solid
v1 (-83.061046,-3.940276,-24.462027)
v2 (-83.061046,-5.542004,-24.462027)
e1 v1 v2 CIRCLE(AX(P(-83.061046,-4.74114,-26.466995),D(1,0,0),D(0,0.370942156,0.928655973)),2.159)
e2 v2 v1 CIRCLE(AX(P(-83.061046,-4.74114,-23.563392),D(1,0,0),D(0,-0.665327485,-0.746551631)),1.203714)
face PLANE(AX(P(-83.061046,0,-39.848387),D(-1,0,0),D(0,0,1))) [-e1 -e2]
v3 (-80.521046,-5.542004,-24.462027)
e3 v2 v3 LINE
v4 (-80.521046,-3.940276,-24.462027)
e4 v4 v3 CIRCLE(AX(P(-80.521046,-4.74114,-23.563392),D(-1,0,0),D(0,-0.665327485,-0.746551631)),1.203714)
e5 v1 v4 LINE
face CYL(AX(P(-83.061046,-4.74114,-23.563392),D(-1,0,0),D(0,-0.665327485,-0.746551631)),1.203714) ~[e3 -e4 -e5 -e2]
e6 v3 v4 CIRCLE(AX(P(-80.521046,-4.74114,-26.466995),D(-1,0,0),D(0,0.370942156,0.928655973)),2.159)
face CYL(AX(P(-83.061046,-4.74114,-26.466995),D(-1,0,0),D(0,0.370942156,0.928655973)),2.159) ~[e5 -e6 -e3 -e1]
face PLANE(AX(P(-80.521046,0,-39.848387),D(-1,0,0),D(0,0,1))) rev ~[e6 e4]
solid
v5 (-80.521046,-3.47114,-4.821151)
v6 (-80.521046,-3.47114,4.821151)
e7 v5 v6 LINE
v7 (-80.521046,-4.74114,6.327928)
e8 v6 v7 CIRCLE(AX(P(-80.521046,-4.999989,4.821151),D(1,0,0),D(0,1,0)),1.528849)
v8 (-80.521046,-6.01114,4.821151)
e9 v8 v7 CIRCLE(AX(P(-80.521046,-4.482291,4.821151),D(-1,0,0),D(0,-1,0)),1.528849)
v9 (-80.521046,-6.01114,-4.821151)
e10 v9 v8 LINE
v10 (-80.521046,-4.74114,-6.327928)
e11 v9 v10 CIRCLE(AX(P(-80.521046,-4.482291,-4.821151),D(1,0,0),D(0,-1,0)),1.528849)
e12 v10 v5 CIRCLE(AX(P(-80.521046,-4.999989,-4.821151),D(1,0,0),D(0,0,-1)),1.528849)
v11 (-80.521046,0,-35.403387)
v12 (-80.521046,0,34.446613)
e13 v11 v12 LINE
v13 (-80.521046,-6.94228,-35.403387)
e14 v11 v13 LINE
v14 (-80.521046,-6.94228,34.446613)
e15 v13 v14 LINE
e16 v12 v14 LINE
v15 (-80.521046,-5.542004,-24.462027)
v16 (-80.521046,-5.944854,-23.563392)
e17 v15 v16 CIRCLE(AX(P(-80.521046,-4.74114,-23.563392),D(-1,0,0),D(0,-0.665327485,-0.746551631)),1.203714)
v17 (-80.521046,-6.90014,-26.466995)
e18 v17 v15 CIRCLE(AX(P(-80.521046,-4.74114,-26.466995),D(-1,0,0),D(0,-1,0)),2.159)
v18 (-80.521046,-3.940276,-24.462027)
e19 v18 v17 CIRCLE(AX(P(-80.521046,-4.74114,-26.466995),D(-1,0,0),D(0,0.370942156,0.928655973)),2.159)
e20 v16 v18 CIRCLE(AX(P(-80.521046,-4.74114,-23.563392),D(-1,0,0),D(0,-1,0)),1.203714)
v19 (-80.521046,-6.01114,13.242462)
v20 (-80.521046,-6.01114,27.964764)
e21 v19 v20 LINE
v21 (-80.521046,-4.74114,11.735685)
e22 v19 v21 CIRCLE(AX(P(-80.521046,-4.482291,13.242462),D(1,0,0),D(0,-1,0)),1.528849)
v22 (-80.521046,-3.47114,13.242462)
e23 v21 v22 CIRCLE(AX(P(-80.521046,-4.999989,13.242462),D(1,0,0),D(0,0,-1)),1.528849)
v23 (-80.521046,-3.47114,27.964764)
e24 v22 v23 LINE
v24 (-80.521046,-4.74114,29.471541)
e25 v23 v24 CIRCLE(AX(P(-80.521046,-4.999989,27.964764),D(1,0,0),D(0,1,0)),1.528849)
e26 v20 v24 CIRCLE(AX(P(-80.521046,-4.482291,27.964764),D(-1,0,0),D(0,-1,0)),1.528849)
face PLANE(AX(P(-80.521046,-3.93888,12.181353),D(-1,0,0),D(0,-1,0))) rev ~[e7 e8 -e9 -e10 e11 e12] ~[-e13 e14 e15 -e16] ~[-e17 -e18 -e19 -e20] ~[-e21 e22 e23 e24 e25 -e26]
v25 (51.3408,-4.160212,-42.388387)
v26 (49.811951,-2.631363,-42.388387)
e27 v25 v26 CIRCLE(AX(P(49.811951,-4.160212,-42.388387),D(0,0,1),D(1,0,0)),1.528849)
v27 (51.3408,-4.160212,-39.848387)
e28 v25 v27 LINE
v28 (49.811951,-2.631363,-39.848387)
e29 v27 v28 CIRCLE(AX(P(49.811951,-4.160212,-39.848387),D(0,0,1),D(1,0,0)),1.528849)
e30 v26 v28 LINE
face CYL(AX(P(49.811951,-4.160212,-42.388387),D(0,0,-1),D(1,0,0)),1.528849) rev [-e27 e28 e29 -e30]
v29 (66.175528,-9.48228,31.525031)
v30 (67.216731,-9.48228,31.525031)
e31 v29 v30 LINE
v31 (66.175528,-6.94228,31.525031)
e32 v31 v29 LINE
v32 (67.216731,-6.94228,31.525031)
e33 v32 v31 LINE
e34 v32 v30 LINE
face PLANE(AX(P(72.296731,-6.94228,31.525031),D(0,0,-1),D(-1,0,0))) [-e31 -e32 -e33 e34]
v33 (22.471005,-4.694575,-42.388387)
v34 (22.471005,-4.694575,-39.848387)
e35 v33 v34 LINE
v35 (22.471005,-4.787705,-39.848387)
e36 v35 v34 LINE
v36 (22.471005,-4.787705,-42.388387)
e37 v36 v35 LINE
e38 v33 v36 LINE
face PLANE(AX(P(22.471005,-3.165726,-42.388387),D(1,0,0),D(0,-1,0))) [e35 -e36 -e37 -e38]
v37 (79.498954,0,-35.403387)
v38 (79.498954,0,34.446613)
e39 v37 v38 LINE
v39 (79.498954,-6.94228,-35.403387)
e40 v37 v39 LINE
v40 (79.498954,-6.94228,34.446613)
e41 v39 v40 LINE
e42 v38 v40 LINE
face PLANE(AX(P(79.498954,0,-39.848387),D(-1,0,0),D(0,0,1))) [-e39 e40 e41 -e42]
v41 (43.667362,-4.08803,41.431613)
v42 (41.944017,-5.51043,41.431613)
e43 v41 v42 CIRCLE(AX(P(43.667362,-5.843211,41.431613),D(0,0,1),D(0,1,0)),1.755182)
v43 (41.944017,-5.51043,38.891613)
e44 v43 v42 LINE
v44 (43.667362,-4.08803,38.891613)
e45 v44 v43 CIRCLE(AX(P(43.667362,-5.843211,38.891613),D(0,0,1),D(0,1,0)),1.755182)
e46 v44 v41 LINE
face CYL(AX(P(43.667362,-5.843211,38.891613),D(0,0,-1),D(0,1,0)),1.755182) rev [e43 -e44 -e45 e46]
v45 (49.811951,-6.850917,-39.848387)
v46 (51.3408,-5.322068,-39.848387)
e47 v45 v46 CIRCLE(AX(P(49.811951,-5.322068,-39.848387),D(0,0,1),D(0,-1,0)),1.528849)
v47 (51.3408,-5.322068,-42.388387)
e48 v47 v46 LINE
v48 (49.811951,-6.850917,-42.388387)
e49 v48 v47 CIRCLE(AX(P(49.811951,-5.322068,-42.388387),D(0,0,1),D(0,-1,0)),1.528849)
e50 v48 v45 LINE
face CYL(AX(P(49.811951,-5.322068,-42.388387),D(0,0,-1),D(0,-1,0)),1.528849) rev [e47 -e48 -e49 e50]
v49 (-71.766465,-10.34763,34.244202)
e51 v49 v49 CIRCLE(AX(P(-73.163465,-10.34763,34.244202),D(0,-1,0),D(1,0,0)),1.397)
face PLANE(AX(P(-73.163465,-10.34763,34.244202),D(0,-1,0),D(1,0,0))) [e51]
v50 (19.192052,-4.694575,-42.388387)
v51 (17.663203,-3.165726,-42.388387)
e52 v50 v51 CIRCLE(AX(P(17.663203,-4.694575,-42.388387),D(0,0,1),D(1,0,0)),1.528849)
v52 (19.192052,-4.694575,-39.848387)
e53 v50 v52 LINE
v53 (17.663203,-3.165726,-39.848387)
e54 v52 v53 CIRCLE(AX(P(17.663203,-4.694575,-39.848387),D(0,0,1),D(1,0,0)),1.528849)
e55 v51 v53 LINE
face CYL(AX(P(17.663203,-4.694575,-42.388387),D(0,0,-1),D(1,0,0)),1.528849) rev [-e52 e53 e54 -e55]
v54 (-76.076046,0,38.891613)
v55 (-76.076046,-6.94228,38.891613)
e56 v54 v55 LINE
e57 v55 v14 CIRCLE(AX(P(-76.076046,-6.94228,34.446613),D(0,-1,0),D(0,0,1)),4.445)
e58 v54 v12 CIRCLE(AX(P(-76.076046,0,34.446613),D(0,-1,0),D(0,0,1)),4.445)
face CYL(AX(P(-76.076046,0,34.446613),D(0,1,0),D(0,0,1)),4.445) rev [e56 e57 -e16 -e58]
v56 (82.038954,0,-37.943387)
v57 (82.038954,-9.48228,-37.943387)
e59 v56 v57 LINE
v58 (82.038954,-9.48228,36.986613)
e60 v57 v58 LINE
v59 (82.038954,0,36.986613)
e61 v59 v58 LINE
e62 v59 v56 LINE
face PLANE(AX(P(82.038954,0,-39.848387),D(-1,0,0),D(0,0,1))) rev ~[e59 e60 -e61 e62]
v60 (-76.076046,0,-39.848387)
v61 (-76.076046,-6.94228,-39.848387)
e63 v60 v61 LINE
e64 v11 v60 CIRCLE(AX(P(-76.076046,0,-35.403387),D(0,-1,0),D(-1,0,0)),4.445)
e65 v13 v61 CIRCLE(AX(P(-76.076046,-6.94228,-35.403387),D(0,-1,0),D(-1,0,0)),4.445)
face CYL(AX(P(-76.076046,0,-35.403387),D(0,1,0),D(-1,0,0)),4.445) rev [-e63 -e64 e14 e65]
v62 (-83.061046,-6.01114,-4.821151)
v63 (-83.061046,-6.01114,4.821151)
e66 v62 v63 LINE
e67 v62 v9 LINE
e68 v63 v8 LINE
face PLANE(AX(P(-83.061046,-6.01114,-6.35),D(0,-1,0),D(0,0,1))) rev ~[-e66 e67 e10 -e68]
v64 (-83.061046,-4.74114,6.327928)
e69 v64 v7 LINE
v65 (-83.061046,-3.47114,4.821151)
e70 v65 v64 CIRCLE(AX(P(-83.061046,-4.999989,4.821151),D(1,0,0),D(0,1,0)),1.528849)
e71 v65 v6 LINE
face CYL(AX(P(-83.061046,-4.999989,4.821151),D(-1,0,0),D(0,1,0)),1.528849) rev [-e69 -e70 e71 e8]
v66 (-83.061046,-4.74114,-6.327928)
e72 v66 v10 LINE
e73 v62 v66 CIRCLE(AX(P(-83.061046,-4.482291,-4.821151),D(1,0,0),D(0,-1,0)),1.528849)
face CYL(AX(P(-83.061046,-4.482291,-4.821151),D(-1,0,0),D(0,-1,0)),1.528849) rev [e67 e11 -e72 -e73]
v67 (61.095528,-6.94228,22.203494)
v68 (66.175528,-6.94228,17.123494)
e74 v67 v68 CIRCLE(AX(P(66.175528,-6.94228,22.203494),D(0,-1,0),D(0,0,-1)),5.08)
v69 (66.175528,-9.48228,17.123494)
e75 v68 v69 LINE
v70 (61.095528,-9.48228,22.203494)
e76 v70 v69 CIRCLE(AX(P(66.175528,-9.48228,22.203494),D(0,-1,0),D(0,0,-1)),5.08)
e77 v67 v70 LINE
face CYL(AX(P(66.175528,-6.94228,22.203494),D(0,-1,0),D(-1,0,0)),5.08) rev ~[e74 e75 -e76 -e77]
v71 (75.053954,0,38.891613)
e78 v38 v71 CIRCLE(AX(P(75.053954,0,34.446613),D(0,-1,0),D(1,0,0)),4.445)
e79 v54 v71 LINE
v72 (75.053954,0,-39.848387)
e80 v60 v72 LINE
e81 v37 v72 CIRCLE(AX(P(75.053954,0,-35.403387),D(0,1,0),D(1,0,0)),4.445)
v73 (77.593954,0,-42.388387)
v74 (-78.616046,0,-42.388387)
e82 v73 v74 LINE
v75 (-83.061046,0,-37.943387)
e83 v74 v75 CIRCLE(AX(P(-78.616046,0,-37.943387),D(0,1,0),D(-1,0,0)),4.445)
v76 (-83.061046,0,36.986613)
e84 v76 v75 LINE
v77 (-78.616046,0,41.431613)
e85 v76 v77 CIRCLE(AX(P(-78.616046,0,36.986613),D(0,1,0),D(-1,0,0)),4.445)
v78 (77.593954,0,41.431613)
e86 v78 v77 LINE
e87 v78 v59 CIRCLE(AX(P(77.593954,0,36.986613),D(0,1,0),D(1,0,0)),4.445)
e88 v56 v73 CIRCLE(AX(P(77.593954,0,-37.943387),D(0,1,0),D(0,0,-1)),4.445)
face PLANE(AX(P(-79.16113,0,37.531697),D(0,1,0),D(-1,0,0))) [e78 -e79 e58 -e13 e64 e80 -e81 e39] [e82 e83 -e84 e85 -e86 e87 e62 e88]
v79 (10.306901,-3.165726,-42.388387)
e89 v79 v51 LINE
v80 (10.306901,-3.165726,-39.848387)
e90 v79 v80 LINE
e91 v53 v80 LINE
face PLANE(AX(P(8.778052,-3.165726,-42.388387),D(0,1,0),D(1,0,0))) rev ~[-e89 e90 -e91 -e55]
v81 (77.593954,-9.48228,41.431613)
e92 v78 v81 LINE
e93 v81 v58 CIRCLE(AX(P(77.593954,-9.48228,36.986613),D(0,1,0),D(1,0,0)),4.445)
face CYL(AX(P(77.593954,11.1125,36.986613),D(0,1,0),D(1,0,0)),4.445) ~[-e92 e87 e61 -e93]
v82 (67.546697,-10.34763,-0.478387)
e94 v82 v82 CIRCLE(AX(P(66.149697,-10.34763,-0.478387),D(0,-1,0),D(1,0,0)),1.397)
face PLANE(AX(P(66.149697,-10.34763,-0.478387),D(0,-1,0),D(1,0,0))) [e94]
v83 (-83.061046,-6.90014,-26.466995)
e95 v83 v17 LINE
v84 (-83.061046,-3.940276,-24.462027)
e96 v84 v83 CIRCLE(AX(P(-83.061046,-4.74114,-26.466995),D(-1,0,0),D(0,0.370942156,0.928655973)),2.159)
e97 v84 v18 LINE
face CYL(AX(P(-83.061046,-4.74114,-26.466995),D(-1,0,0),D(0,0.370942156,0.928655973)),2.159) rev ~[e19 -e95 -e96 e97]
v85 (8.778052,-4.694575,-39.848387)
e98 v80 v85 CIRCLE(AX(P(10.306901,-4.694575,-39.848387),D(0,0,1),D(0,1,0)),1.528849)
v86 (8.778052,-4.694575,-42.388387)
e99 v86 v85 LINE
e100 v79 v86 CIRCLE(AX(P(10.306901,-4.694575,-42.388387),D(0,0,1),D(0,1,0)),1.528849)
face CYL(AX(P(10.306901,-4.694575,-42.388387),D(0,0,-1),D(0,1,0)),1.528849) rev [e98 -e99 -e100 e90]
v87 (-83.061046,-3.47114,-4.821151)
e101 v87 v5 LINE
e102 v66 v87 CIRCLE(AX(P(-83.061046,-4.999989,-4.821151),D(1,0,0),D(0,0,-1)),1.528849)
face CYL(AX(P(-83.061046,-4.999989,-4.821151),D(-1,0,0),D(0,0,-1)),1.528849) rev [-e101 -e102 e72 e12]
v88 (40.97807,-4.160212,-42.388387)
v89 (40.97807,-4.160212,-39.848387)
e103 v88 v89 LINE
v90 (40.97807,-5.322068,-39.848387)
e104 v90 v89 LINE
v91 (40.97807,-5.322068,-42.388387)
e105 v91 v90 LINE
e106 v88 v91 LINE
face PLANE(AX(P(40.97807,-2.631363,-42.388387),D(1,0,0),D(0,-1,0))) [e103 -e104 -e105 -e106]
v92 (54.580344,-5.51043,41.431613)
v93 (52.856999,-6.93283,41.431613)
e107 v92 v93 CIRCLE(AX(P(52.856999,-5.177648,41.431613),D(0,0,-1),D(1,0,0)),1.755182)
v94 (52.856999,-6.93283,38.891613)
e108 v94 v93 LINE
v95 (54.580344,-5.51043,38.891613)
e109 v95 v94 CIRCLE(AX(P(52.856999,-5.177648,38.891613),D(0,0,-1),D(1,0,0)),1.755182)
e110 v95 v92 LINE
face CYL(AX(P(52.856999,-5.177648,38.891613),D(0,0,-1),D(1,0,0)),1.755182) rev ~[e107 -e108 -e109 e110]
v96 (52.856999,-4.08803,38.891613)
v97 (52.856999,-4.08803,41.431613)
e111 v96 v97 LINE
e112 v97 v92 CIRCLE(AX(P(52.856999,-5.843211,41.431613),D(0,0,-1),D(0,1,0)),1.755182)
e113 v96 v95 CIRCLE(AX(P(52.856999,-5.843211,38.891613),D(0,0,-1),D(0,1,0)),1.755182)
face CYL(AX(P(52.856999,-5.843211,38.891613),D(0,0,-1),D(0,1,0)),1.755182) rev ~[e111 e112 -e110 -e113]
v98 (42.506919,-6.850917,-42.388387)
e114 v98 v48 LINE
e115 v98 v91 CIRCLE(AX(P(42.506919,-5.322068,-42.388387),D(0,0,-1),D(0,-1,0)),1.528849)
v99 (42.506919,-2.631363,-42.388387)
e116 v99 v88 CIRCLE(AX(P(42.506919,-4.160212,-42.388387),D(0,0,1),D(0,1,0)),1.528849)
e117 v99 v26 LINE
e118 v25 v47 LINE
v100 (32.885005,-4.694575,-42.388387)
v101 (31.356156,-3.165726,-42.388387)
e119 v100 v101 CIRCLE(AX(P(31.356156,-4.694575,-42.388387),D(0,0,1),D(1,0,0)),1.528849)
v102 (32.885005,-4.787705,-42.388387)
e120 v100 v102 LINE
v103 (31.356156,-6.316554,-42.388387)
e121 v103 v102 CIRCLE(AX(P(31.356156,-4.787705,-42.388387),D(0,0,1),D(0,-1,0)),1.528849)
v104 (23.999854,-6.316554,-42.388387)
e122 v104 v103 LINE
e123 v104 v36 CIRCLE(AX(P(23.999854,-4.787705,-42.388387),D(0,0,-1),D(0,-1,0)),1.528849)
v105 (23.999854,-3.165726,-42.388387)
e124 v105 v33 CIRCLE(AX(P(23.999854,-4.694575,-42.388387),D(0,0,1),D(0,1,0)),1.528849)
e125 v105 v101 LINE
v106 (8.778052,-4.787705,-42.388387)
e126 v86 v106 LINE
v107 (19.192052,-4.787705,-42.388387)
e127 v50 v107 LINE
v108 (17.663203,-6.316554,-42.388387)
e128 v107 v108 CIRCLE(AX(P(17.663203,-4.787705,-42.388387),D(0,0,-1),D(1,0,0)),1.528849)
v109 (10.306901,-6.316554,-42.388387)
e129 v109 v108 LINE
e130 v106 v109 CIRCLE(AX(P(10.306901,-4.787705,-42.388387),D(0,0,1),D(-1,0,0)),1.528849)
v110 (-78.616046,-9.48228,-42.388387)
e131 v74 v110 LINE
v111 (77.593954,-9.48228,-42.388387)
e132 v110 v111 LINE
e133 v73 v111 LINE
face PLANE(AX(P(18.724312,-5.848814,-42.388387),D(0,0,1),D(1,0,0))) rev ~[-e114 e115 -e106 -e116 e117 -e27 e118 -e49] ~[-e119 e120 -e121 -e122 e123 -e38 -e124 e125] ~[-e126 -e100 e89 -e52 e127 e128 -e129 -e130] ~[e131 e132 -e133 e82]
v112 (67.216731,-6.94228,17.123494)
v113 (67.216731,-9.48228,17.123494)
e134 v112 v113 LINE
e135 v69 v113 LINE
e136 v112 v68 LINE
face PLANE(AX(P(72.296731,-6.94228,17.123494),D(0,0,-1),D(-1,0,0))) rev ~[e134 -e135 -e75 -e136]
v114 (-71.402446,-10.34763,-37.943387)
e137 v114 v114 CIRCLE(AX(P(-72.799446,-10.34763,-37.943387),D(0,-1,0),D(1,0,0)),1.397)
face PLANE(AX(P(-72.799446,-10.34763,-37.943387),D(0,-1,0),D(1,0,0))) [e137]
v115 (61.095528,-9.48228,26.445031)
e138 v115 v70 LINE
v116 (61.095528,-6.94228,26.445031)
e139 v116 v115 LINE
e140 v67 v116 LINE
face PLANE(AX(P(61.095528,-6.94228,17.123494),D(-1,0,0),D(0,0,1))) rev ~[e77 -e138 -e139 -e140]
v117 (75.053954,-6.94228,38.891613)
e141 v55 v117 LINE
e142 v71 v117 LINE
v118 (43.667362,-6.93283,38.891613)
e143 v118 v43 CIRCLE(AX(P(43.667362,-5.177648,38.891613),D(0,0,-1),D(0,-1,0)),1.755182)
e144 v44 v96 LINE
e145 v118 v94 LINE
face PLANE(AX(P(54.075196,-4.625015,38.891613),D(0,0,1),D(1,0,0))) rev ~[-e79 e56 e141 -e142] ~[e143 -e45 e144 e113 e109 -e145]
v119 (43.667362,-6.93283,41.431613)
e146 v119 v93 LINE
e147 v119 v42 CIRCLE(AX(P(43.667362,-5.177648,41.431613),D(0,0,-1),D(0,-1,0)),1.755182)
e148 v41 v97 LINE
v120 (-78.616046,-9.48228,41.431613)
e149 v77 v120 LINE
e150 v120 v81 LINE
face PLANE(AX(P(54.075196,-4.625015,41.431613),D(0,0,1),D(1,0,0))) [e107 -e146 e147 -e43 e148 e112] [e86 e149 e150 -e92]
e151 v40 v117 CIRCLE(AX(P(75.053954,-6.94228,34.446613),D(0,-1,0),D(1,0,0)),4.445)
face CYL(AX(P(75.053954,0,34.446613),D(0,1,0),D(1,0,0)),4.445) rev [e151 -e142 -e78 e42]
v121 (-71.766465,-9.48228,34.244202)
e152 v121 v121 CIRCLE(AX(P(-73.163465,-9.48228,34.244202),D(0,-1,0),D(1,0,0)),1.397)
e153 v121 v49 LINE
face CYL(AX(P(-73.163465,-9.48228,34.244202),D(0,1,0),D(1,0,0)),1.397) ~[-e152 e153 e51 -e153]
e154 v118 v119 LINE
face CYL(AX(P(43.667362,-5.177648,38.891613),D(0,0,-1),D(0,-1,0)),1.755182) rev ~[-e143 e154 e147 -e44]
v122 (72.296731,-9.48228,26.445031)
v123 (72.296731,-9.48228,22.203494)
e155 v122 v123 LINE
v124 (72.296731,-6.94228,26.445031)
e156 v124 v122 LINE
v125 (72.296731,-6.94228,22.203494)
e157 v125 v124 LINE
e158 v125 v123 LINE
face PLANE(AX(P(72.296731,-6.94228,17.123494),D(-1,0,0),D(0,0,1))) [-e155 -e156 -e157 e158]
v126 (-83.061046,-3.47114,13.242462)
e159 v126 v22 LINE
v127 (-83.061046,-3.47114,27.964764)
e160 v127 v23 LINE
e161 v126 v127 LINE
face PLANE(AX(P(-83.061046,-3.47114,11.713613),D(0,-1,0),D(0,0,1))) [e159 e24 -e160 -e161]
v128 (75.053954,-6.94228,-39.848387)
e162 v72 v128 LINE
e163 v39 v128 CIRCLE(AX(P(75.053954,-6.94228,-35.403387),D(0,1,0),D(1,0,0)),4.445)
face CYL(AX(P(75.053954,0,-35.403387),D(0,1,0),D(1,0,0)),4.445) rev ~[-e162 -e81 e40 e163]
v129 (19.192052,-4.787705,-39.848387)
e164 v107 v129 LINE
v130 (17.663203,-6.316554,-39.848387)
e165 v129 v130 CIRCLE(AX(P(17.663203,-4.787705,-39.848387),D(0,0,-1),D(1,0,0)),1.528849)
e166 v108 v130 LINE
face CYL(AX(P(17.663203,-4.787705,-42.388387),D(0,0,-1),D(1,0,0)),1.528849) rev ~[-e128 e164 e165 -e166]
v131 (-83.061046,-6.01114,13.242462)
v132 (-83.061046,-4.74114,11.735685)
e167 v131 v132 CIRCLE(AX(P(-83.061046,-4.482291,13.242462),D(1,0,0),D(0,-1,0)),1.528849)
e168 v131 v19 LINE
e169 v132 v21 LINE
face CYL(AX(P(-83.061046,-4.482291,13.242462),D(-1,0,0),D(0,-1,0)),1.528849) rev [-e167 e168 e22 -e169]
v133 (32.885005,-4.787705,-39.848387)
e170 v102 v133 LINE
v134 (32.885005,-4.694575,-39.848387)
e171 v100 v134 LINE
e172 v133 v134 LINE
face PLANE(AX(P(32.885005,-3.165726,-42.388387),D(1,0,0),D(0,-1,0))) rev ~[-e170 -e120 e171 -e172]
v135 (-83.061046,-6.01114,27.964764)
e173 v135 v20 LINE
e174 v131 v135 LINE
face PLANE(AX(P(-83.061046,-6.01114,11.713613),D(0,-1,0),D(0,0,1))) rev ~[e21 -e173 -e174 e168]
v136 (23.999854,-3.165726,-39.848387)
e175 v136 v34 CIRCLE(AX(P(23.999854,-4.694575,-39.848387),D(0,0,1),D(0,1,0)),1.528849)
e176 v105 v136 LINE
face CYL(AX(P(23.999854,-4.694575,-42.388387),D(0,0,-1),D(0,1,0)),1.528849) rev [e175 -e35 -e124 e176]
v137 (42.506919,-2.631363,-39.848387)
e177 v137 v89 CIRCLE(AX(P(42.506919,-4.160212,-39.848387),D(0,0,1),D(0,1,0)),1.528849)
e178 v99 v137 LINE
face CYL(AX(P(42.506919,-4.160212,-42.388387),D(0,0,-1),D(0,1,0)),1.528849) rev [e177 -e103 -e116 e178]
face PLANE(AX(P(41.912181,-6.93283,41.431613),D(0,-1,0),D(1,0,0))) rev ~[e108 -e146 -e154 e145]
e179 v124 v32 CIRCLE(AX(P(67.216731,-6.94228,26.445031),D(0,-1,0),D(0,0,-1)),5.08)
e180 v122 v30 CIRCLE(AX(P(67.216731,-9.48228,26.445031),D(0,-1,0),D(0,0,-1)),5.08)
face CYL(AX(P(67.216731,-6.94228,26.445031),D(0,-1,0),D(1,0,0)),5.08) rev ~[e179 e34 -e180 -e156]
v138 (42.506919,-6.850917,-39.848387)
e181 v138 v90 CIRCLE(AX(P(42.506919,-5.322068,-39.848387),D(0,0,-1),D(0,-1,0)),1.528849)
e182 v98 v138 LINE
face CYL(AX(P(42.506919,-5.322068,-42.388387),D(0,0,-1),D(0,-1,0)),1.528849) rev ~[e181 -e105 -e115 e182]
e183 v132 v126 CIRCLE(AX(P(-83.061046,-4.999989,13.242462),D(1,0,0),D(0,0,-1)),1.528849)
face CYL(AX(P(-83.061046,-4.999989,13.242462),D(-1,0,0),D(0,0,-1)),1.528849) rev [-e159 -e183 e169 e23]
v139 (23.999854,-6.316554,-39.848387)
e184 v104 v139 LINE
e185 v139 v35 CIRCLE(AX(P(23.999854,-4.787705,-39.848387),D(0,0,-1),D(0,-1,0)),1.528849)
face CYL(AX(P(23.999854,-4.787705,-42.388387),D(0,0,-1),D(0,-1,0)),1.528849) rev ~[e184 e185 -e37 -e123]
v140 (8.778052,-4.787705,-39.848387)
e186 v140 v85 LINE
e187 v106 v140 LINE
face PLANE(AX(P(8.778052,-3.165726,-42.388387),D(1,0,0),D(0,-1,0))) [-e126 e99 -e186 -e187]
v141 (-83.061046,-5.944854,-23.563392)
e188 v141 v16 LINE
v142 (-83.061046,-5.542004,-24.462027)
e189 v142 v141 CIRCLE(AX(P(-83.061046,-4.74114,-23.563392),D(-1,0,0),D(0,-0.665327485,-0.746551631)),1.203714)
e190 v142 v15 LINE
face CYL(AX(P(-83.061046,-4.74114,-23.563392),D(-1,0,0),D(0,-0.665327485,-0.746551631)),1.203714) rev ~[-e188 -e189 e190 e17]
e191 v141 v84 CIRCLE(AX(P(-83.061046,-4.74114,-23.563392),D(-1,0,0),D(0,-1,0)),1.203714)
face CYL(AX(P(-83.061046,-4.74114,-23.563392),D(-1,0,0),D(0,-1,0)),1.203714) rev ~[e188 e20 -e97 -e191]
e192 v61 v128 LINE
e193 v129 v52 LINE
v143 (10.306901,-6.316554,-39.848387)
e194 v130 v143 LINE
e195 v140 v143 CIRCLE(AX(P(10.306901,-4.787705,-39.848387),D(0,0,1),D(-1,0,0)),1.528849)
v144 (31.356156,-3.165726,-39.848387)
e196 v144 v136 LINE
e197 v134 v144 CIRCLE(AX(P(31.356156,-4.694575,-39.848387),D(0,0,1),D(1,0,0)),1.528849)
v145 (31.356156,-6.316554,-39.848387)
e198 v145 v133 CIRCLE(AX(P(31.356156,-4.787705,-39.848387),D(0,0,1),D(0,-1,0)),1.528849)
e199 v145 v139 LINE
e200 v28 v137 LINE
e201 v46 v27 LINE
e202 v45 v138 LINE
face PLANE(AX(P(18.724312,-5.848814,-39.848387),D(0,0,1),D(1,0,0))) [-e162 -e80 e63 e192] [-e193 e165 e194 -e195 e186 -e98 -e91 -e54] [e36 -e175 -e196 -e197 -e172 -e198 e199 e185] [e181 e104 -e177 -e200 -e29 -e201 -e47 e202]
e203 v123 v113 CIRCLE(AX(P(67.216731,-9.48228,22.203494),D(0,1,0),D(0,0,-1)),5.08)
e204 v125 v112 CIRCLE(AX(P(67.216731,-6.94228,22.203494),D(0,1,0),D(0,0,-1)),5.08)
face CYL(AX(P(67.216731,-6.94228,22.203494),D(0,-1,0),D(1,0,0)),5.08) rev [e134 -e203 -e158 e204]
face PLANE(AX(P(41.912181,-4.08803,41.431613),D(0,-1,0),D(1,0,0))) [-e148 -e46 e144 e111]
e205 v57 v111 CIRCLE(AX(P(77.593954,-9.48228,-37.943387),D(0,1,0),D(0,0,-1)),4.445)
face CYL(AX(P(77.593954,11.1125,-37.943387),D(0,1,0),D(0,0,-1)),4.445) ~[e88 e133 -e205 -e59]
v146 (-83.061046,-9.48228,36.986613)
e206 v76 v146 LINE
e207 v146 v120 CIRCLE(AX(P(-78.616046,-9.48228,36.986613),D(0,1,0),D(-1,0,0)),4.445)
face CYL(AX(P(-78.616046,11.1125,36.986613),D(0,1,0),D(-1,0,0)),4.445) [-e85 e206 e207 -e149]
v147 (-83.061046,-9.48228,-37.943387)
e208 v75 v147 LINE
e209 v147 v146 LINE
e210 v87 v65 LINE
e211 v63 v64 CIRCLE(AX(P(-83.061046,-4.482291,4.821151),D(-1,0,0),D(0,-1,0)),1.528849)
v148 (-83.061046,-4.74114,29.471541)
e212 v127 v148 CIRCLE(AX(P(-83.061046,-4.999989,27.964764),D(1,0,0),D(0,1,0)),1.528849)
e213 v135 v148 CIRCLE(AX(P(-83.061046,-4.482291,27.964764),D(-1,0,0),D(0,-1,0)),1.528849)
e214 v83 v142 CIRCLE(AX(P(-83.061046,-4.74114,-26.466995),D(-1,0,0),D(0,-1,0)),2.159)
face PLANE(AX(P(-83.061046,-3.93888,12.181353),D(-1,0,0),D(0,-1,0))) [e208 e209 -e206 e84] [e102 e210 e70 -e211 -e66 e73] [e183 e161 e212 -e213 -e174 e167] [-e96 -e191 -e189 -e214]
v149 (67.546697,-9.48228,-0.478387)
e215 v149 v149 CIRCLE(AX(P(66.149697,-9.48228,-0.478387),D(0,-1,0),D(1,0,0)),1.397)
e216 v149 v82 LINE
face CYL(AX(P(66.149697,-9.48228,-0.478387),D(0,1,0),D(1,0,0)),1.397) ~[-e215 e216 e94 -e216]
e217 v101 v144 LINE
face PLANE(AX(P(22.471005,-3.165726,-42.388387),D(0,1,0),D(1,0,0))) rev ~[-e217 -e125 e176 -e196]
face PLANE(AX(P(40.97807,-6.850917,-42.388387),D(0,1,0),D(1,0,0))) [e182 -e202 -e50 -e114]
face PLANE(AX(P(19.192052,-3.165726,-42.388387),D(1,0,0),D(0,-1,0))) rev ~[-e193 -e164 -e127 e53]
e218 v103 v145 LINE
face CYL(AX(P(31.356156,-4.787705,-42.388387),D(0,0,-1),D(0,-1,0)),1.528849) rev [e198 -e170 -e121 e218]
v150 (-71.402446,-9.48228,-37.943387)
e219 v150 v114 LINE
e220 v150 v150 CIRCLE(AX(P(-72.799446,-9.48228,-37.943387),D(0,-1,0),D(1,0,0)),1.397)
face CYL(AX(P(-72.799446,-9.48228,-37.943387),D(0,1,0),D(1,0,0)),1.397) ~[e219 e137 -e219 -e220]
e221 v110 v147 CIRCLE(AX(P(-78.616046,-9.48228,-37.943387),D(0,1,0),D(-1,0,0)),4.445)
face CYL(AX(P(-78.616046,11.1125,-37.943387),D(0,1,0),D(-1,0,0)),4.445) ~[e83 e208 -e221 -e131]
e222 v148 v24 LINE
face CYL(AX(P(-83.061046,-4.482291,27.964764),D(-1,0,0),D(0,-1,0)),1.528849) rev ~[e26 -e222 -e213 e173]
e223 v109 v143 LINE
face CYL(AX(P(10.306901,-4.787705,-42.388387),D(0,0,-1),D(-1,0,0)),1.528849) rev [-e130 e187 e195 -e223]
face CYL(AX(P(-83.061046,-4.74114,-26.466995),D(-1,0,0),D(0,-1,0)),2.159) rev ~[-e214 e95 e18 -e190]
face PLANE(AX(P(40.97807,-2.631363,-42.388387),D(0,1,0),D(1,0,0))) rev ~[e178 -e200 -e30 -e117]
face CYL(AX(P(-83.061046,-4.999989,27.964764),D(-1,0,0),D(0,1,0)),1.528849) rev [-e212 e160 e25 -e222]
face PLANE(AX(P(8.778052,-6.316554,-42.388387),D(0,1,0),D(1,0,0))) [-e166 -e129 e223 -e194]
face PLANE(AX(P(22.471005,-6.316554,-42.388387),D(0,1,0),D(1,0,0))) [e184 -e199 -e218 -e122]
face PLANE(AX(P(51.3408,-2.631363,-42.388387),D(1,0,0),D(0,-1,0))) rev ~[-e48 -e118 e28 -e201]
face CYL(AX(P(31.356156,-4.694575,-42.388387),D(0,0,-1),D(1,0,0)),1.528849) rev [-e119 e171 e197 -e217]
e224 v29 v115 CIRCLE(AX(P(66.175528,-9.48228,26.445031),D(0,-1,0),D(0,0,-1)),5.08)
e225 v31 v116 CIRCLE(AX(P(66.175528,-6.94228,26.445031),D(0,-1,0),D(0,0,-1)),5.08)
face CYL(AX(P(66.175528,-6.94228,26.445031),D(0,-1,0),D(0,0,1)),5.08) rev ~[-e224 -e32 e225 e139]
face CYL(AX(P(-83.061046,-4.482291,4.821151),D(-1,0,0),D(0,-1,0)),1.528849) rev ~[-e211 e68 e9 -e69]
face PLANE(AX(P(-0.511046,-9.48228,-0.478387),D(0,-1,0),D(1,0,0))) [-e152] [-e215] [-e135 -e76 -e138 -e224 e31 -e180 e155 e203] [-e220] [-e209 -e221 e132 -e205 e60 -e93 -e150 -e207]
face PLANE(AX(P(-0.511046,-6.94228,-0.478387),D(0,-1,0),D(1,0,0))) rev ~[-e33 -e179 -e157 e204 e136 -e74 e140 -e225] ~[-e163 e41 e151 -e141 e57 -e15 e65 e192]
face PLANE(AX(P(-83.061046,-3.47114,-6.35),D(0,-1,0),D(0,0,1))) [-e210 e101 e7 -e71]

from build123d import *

# Parameters (mm, degrees)
F0_W         = 160.02
F0_H         = 78.74
F1_DEPTH     = 6.94228
F2_T         = 2.54
F3_T1_DEPTH  = 6.94228
F3_T3_DEPTH  = 31.70728
F4_W         = 11.2012028694
F4_H         = 14.4015364349
F6_DEPTH     = 25.4
F7_R         = 5.08
F8_W         = 2.54
F8_H         = 12.7
F8_H_2       = 17.78
F9_DEPTH     = 25.4
F10_W        = 10.3627294302
F10_H        = 4.2195547159
F10_W_2      = 10.414
F10_H_2      = 3.1508285339
F11_DEPTH    = 25.4
F12_T1_DEPTH = 2.54
F12_T3_DEPTH = 2.54
F13_W        = 12.7
F13_H        = 2.8448
F14_DEPTH    = 25.4
F15_T1_DEPTH = 2.54
F16_R        = 1.397
F17_DEPTH    = 0.86535


# Not quite as in the source:
# - a fillet or chamfer that OpenCascade refuses, or shapes differently, is made with other operations: its cross-section is extruded or revolved along the edge and cut away or added


with BuildPart() as f1:
    # F0 (on Front) → F1 (new body)
    with BuildSketch(Plane.XZ):
        with Locations((-0.5110458827, -0.4783872414)):
            Rectangle(F0_W, F0_H)
    extrude(amount=F1_DEPTH)

    # F2
    f2_openings = [f1.faces().sort_by_distance(p)[0] for p in [
        (-0.511046, 0, -0.478387),
    ]]
    offset(amount=F2_T, openings=f2_openings, kind=Kind.INTERSECTION)

    # F3: fillet of radius 4.445 on 8 edges, made by hand

    # F3_s2 → F3_t1 (join)
    with BuildSketch(Plane.XZ):
        with BuildLine():
            ThreePointArc((-76.0760458827, 38.8916127586), (-79.2191355251, 37.589702401), (-80.5210458827, 34.4466127586))
            Line((-80.5210458827, 34.4466127586), (-80.5210458827, 38.8916127586))
            Line((-80.5210458827, 38.8916127586), (-76.0760458827, 38.8916127586))
        make_face()
        with BuildLine():
            ThreePointArc((-80.5210458827, -35.4033872414), (-79.2191355251, -38.5464768837), (-76.0760458827, -39.8483872414))
            Line((-76.0760458827, -39.8483872414), (-80.5210458827, -39.8483872414))
            Line((-80.5210458827, -39.8483872414), (-80.5210458827, -35.4033872414))
        make_face()
        with BuildLine():
            ThreePointArc((79.4989541173, -35.4033872414), (78.1970437597, -38.5464768837), (75.0539541173, -39.8483872414))
            Line((75.0539541173, -39.8483872414), (79.4989541173, -39.8483872414))
            Line((79.4989541173, -39.8483872414), (79.4989541173, -35.4033872414))
        make_face()
        with BuildLine():
            ThreePointArc((79.4989541173, 34.4466127586), (78.1970437597, 37.589702401), (75.0539541173, 38.8916127586))
            Line((75.0539541173, 38.8916127586), (79.4989541173, 38.8916127586))
            Line((79.4989541173, 38.8916127586), (79.4989541173, 34.4466127586))
        make_face()
    extrude(amount=F3_T1_DEPTH)

    # F3_s4 → F3_t3 (cut)
    with BuildSketch(Plane.XZ.offset(-11.1125)):
        with BuildLine():
            ThreePointArc((77.5939541173, -42.3883872414), (80.7370437597, -41.0864768837), (82.0389541173, -37.9433872414))
            Line((82.0389541173, -37.9433872414), (82.0389541173, -42.3883872414))
            Line((82.0389541173, -42.3883872414), (77.5939541173, -42.3883872414))
        make_face()
        with BuildLine():
            ThreePointArc((82.0389541173, 36.9866127586), (80.7370437597, 40.129702401), (77.5939541173, 41.4316127586))
            Line((77.5939541173, 41.4316127586), (82.0389541173, 41.4316127586))
            Line((82.0389541173, 41.4316127586), (82.0389541173, 36.9866127586))
        make_face()
        with BuildLine():
            ThreePointArc((-83.0610458827, 36.9866127586), (-81.7591355251, 40.129702401), (-78.6160458827, 41.4316127586))
            Line((-78.6160458827, 41.4316127586), (-83.0610458827, 41.4316127586))
            Line((-83.0610458827, 41.4316127586), (-83.0610458827, 36.9866127586))
        make_face()
        with BuildLine():
            ThreePointArc((-83.0610458827, -37.9433872414), (-81.7591355251, -41.0864768837), (-78.6160458827, -42.3883872414))
            Line((-78.6160458827, -42.3883872414), (-83.0610458827, -42.3883872414))
            Line((-83.0610458827, -42.3883872414), (-83.0610458827, -37.9433872414))
        make_face()
    extrude(amount=F3_T3_DEPTH, mode=Mode.SUBTRACT)

    # F4 (on face) → F6 (cut)
    with BuildSketch(Plane(origin=(0, -6.94228, 0), x_dir=(-1, 0, 0), z_dir=(0, 1, 0))):
        with Locations((-66.6961297393, 24.3242625147)):
            Rectangle(F4_W, F4_H)
    extrude(amount=-F6_DEPTH, mode=Mode.SUBTRACT)

    # F7
    f7_edges = [f1.edges().sort_by_distance(p)[0] for p in [
        (72.296731, -8.21228, 31.525031),
        (72.296731, -8.21228, 17.123494),
        (61.095528, -8.21228, 31.525031),
        (61.095528, -8.21228, 17.123494),
    ]]
    fillet(f7_edges, radius=F7_R)

    # F8 (on face) → F9 (cut)
    with BuildSketch(Plane(origin=(-83.0610458827, 0, 0), x_dir=(0, -1, 0), z_dir=(-1, 0, 0))):
        with BuildLine():
            ThreePointArc((3.9402758845, -24.4620272314), (3.5303106613, -28.2545002504), (6.90014, -26.4669954777))
            ThreePointArc((6.90014, -26.4669954777), (6.5286447728, -25.256166139), (5.5420041155, -24.4620272314))
            ThreePointArc((5.5420041155, -24.4620272314), (4.74114, -24.7671066221), (3.9402758845, -24.4620272314))
        make_face()
        with BuildLine():
            ThreePointArc((3.9402758845, -24.4620272314), (4.74114, -24.3079954777), (5.5420041155, -24.4620272314))
            ThreePointArc((5.5420041155, -24.4620272314), (5.8395341143, -24.0557928593), (5.9448541617, -23.5633924603))
            ThreePointArc((5.9448541617, -23.5633924603), (4.2487396011, -22.4649983461), (3.9402758845, -24.4620272314))
        make_face()
        with Locations((4.74114, 0)):
            Rectangle(F8_W, F8_H)
        with Locations((4.74114, 20.6036127586)):
            Rectangle(F8_W, F8_H_2)
    extrude(amount=-F9_DEPTH, mode=Mode.SUBTRACT)

    # F10 (on face) → F11 (cut)
    with BuildSketch(Plane(origin=(0, 0, -42.3883872414), x_dir=(1, 0, 0), z_dir=(0, 0, -1))):
        with Locations((46.1594350636, 4.74114)):
            Rectangle(F10_W, F10_H)
        with Locations((27.6780048452, 4.74114)):
            Rectangle(F10_W_2, F10_H_2)
        with Locations((13.9850524713, 4.74114)):
            Rectangle(F10_W_2, F10_H_2)
    extrude(amount=-F11_DEPTH, mode=Mode.SUBTRACT)

    # F12: fillet of radius 1.5288490226 on 20 edges, made by hand

    # F12_s2 → F12_t1 (join)
    with BuildSketch(Plane.XY.offset(-42.3883872414)):
        with BuildLine():
            ThreePointArc((19.1920524713, -4.7877052443), (18.7442629599, -5.8687647556), (17.6632034486, -6.316554267))
            Line((17.6632034486, -6.316554267), (19.1920524713, -6.316554267))
            Line((19.1920524713, -6.316554267), (19.1920524713, -4.7877052443))
        make_face()
        with BuildLine():
            ThreePointArc((8.7780524713, -4.7877052443), (9.2258419826, -5.8687647556), (10.3069014939, -6.316554267))
            Line((10.3069014939, -6.316554267), (8.7780524713, -6.316554267))
            Line((8.7780524713, -6.316554267), (8.7780524713, -4.7877052443))
        make_face()
        with BuildLine():
            ThreePointArc((10.3069014939, -3.165725733), (9.2258419826, -3.6135152444), (8.7780524713, -4.6945747557))
            Line((8.7780524713, -4.6945747557), (8.7780524713, -3.165725733))
            Line((8.7780524713, -3.165725733), (10.3069014939, -3.165725733))
        make_face()
        with BuildLine():
            ThreePointArc((19.1920524713, -4.6945747557), (18.7442629599, -3.6135152444), (17.6632034486, -3.165725733))
            Line((17.6632034486, -3.165725733), (19.1920524713, -3.165725733))
            Line((19.1920524713, -3.165725733), (19.1920524713, -4.6945747557))
        make_face()
        with BuildLine():
            ThreePointArc((31.3561558226, -6.316554267), (32.4372153339, -5.8687647556), (32.8850048452, -4.7877052443))
            Line((32.8850048452, -4.7877052443), (32.8850048452, -6.316554267))
            Line((32.8850048452, -6.316554267), (31.3561558226, -6.316554267))
        make_face()
        with BuildLine():
            ThreePointArc((32.8850048452, -4.6945747557), (32.4372153339, -3.6135152444), (31.3561558226, -3.165725733))
            Line((31.3561558226, -3.165725733), (32.8850048452, -3.165725733))
            Line((32.8850048452, -3.165725733), (32.8850048452, -4.6945747557))
        make_face()
        with BuildLine():
            ThreePointArc((23.9998538678, -6.316554267), (22.9187943565, -5.8687647556), (22.4710048452, -4.7877052443))
            Line((22.4710048452, -4.7877052443), (22.4710048452, -6.316554267))
            Line((22.4710048452, -6.316554267), (23.9998538678, -6.316554267))
        make_face()
        with BuildLine():
            ThreePointArc((23.9998538678, -3.165725733), (22.9187943565, -3.6135152444), (22.4710048452, -4.6945747557))
            Line((22.4710048452, -4.6945747557), (22.4710048452, -3.165725733))
            Line((22.4710048452, -3.165725733), (23.9998538678, -3.165725733))
        make_face()
        with BuildLine():
            ThreePointArc((51.3407997787, -4.1602116647), (50.8930102674, -3.0791521534), (49.8119507561, -2.631362642))
            Line((49.8119507561, -2.631362642), (51.3407997787, -2.631362642))
            Line((51.3407997787, -2.631362642), (51.3407997787, -4.1602116647))
        make_face()
        with BuildLine():
            ThreePointArc((49.8119507561, -6.850917358), (50.8930102674, -6.4031278466), (51.3407997787, -5.3220683353))
            Line((51.3407997787, -5.3220683353), (51.3407997787, -6.850917358))
            Line((51.3407997787, -6.850917358), (49.8119507561, -6.850917358))
        make_face()
        with BuildLine():
            ThreePointArc((42.5069193711, -6.850917358), (41.4258598598, -6.4031278466), (40.9780703485, -5.3220683353))
            Line((40.9780703485, -5.3220683353), (40.9780703485, -6.850917358))
            Line((40.9780703485, -6.850917358), (42.5069193711, -6.850917358))
        make_face()
        with BuildLine():
            ThreePointArc((42.5069193711, -2.631362642), (41.4258598598, -3.0791521534), (40.9780703485, -4.1602116647))
            Line((40.9780703485, -4.1602116647), (40.9780703485, -2.631362642))
            Line((40.9780703485, -2.631362642), (42.5069193711, -2.631362642))
        make_face()
    extrude(amount=F12_T1_DEPTH)

    # F12_s4 → F12_t3 (join)
    with BuildSketch(Plane.YZ.offset(-83.0610458827)):
        with BuildLine():
            ThreePointArc((-4.9999890226, 11.7136127586), (-3.9189295113, 12.16140227), (-3.47114, 13.2424617813))
            Line((-3.47114, 13.2424617813), (-3.47114, 11.7136127586))
            Line((-3.47114, 11.7136127586), (-4.9999890226, 11.7136127586))
        make_face()
        with BuildLine():
            ThreePointArc((-6.01114, 27.964763736), (-5.5633504887, 29.0458232473), (-4.4822909774, 29.4936127586))
            Line((-4.4822909774, 29.4936127586), (-6.01114, 29.4936127586))
            Line((-6.01114, 29.4936127586), (-6.01114, 27.964763736))
        make_face()
        with BuildLine():
            ThreePointArc((-3.47114, 27.964763736), (-3.9189295113, 29.0458232473), (-4.9999890226, 29.4936127586))
            Line((-4.9999890226, 29.4936127586), (-3.47114, 29.4936127586))
            Line((-3.47114, 29.4936127586), (-3.47114, 27.964763736))
        make_face()
        with BuildLine():
            ThreePointArc((-6.01114, 13.2424617813), (-5.5633504887, 12.16140227), (-4.4822909774, 11.7136127586))
            Line((-4.4822909774, 11.7136127586), (-6.01114, 11.7136127586))
            Line((-6.01114, 11.7136127586), (-6.01114, 13.2424617813))
        make_face()
        with BuildLine():
            ThreePointArc((-6.01114, 4.8211509774), (-5.5633504887, 5.9022104887), (-4.4822909774, 6.35))
            Line((-4.4822909774, 6.35), (-6.01114, 6.35))
            Line((-6.01114, 6.35), (-6.01114, 4.8211509774))
        make_face()
        with BuildLine():
            ThreePointArc((-6.01114, -4.8211509774), (-5.5633504887, -5.9022104887), (-4.4822909774, -6.35))
            Line((-4.4822909774, -6.35), (-6.01114, -6.35))
            Line((-6.01114, -6.35), (-6.01114, -4.8211509774))
        make_face()
        with BuildLine():
            ThreePointArc((-4.9999890226, -6.35), (-3.9189295113, -5.9022104887), (-3.47114, -4.8211509774))
            Line((-3.47114, -4.8211509774), (-3.47114, -6.35))
            Line((-3.47114, -6.35), (-4.9999890226, -6.35))
        make_face()
        with BuildLine():
            ThreePointArc((-3.47114, 4.8211509774), (-3.9189295113, 5.9022104887), (-4.9999890226, 6.35))
            Line((-4.9999890226, 6.35), (-3.47114, 6.35))
            Line((-3.47114, 6.35), (-3.47114, 4.8211509774))
        make_face()
    extrude(amount=F12_T3_DEPTH)

    # F13 (on face) → F14 (cut)
    with BuildSketch(Plane.XY.offset(41.4316127586)):
        with Locations((48.2621807605, -5.5104298601)):
            Rectangle(F13_W, F13_H)
    extrude(amount=-F14_DEPTH, mode=Mode.SUBTRACT)

    # F15: fillet of radius 1.7551815441 on 4 edges, made by hand

    # F15_s2 → F15_t1 (join)
    with BuildSketch(Plane.XY.offset(38.8916127586)):
        with BuildLine():
            ThreePointArc((52.8569992164, -4.0880298601), (54.0980999884, -4.6021106321), (54.6121807605, -5.8432114042))
            Line((54.6121807605, -5.8432114042), (54.6121807605, -4.0880298601))
            Line((54.6121807605, -4.0880298601), (52.8569992164, -4.0880298601))
        make_face()
        with BuildLine():
            ThreePointArc((43.6673623046, -4.0880298601), (42.4262615326, -4.6021106321), (41.9121807605, -5.8432114042))
            Line((41.9121807605, -5.8432114042), (41.9121807605, -4.0880298601))
            Line((41.9121807605, -4.0880298601), (43.6673623046, -4.0880298601))
        make_face()
        with BuildLine():
            ThreePointArc((54.6121807605, -5.177648316), (54.0980999884, -6.418749088), (52.8569992164, -6.9328298601))
            Line((52.8569992164, -6.9328298601), (54.6121807605, -6.9328298601))
            Line((54.6121807605, -6.9328298601), (54.6121807605, -5.177648316))
        make_face()
        with BuildLine():
            ThreePointArc((43.6673623046, -6.9328298601), (42.4262615326, -6.418749088), (41.9121807605, -5.177648316))
            Line((41.9121807605, -5.177648316), (41.9121807605, -6.9328298601))
            Line((41.9121807605, -6.9328298601), (43.6673623046, -6.9328298601))
        make_face()
    extrude(amount=F15_T1_DEPTH)

    # F16 (on face) → F17 (join)
    with BuildSketch(Plane.XZ.offset(9.48228)):
        with Locations((66.1496967077, -0.4783872414)):
            Circle(F16_R)
        with Locations((-73.1634646654, 34.2442020774)):
            Circle(F16_R)
        with Locations((-72.7994458827, -37.9433872414)):
            Circle(F16_R)
    extrude(amount=F17_DEPTH)


solid = f1.part
